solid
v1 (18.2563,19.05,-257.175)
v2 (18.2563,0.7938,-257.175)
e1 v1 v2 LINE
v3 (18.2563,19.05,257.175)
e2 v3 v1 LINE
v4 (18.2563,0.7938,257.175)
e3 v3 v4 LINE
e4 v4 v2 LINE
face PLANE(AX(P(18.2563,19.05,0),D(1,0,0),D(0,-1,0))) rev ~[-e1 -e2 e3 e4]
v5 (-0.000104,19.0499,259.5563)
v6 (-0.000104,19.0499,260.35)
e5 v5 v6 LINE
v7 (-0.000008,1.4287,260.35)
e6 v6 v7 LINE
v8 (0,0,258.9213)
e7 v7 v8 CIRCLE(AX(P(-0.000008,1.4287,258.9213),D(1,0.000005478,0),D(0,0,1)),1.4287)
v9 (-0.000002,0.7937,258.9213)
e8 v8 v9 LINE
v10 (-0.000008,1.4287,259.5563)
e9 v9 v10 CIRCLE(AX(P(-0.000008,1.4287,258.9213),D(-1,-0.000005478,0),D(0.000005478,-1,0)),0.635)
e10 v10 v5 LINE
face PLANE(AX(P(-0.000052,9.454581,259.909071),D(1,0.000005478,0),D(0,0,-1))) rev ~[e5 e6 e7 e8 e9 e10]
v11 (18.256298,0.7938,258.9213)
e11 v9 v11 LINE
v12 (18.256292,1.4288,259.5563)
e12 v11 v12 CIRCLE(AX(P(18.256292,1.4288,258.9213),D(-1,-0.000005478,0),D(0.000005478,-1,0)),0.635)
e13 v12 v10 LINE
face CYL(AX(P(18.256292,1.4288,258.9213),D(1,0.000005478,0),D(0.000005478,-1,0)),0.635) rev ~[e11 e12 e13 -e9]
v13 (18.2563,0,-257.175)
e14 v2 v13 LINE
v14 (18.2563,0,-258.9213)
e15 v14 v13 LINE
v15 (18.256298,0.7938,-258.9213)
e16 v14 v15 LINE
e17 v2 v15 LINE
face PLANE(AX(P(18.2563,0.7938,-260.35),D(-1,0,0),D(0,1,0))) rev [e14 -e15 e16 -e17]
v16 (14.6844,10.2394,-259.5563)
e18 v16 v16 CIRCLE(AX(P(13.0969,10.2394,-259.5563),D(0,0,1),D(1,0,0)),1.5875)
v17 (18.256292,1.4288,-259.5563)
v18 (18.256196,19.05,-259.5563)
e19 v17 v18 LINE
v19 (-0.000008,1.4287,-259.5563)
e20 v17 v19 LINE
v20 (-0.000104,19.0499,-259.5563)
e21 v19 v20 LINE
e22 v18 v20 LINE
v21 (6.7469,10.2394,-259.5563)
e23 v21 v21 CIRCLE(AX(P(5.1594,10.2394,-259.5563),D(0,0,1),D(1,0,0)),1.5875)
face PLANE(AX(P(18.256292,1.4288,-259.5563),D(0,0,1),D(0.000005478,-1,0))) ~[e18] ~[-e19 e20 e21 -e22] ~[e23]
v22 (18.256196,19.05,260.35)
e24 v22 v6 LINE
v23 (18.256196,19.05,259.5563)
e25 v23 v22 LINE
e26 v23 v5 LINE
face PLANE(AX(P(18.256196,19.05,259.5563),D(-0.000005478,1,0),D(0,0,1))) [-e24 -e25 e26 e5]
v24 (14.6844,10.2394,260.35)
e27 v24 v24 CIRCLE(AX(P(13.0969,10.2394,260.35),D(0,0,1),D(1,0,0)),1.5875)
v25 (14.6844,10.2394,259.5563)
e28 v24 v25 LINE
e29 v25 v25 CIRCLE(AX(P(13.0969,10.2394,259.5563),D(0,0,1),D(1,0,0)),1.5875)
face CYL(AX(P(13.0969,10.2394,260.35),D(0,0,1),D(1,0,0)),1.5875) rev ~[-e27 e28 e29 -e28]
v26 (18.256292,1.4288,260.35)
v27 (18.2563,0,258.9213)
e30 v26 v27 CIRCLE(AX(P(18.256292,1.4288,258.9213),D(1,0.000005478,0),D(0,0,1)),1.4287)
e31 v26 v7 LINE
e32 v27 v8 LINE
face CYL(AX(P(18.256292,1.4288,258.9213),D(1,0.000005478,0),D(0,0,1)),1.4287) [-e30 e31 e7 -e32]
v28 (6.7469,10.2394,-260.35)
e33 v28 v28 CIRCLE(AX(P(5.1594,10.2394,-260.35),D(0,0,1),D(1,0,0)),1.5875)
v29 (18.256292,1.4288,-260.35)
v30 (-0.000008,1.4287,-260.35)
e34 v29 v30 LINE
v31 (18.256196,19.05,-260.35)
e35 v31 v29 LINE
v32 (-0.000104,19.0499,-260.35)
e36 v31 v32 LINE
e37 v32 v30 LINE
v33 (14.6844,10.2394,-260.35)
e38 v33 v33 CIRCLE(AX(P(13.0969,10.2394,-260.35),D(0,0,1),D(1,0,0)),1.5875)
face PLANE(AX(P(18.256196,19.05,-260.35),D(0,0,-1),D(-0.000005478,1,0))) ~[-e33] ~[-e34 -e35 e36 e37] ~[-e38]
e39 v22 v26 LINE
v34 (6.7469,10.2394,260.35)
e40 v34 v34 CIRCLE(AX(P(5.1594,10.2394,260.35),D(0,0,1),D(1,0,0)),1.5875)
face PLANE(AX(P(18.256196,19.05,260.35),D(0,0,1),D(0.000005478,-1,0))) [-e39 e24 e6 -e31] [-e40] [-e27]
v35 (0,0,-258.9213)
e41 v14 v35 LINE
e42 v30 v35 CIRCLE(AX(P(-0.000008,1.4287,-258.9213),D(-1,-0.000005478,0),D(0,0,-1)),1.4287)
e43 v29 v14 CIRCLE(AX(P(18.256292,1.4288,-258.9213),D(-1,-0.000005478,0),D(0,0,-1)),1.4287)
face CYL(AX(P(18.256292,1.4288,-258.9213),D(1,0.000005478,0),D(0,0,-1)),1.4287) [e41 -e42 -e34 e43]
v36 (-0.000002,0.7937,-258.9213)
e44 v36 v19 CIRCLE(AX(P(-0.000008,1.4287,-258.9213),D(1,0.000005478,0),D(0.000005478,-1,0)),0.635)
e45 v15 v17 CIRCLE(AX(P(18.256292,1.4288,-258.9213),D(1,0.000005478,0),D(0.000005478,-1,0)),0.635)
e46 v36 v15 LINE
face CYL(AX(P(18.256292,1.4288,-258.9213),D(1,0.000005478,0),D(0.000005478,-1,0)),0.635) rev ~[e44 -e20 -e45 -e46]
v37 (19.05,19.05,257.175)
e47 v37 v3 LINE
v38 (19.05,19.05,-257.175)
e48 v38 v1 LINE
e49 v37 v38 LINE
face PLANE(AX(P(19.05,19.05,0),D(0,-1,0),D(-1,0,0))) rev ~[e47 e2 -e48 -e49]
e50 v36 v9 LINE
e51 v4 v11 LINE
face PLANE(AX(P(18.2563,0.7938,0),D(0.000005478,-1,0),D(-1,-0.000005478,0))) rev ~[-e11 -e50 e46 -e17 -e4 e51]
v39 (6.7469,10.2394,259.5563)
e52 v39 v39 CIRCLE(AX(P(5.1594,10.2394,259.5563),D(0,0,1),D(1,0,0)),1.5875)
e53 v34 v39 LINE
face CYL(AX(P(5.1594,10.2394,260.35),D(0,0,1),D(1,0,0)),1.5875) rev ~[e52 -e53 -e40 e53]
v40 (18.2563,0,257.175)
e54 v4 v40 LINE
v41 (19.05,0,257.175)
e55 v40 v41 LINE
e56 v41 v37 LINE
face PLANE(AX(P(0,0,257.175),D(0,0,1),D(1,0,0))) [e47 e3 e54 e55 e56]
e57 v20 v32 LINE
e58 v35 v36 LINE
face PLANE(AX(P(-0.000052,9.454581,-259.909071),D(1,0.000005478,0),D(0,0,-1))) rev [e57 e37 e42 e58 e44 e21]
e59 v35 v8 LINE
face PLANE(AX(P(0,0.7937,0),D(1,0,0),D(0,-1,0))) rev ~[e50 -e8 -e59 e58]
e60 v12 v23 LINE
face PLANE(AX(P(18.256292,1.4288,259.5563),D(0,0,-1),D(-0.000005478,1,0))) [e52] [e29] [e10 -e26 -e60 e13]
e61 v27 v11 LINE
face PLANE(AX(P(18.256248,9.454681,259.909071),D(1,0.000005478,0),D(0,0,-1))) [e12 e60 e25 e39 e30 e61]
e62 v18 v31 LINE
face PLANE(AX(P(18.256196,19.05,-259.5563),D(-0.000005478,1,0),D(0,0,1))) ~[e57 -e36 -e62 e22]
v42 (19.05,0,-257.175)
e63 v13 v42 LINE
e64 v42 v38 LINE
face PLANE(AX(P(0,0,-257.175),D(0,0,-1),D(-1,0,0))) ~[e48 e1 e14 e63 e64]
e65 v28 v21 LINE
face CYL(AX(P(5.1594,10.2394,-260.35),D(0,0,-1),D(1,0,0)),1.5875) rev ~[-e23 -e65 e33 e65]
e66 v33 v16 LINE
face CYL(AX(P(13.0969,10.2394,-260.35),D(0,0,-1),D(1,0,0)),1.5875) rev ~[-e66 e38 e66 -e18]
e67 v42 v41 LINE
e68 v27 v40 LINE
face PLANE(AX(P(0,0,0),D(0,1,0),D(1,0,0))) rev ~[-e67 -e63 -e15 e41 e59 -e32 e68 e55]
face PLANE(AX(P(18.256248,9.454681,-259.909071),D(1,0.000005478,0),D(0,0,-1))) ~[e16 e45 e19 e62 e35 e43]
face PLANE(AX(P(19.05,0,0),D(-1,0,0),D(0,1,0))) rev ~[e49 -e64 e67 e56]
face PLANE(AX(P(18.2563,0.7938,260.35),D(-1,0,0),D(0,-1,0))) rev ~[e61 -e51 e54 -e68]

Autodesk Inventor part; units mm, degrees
ref_plane "YZ Plane" through (0, 0, 0) normal (1, 0, 0) x (0, 1, 0)
ref_plane "XZ Plane" through (0, 0, 0) normal (0, 1, 0) x (-1, 0, 0)
ref_plane "XY Plane" through (0, 0, 0) normal (0, 0, 1) x (1, 0, 0)
sketch "Sketch1" plane through (0, 0, 0) normal (0, 0, 1) x (1, 0, 0)
  line L0 (0, 0) -> (19.05, 0)
  line L1 (19.05, 0) -> (19.05, 19.05)
  line L2 (19.05, 19.05) -> (18.2563, 19.05)
  line L3 (18.2563, 19.05) -> (18.2563, 0.7938)
  line L4 (18.2563, 0.7938) -> (0, 0.7937)
  line L5 (0, 0.7937) -> (0, 0)
  dimension "d0" = 19.05
  dimension "d1" = 19.05
  dimension "d2" = 0.7937
extrude "Extrusion1" add sketch "Sketch1" along normal blind 260.35
sketch "Sketch2" plane through (0, 0, 260.35) normal (0, 0, 1) x (1, 0, 0)
  line L0 (0, 0) -> (19.05, 0) projected
  line L1 (19.05, 0) -> (19.05, 19.05) projected
  line L2 (19.05, 19.05) -> (18.2563, 19.05) projected
  line L3 (18.2563, 19.05) -> (18.2563, 0.7938) projected
  line L4 (18.2563, 0.7938) -> (18.2563, 0)
extrude "Extrusion2" cut sketch "Sketch2" against normal blind 3.175
sketch "Sketch3" plane through (18.2563, 0, 259.5563) normal (0, 0, 1) x (1, 0, 0)
  line L0 (-18.2563, 0) -> (0, 0)
  line L1 (0, 0) -> (0, 19.05)
  line L2 (0, 19.05) -> (-18.2563, 19.05)
  line L3 (-18.2563, 19.05) -> (-18.2563, 0)
edge flange "Flange1" height 19.05 angle 90 thickness 0.7937 bend radius 0.635 thickness toward (0, 0, 1) relief straight relief width 0.7937 relief depth 0.3969 edges at (9.1281, 0.7938, 260.35) wall of the first edge with corners at (0, 0, 259.5563) (18.2563, 0, 259.5563) (18.2562, 19.05, 259.5563) (0, 19.05, 259.5563)
bend "Bend1"
corner "Corner1"
sketch "Sketch4" plane through (0, 19.05, 260.35) normal (0, 0, 1) x (1, 0, 0)
  line L0 (0, -17.6213) -> (18.2563, -17.6213) projected
  line L1 (0, 0) -> (18.2563, 0) projected
  circle A0 centre (5.1594, -8.8106) radius 1.5875
  circle A1 centre (13.0969, -8.8106) radius 1.5875
  line L2 (5.1594, -8.8106) -> (13.0969, -8.8106) construction
  line L3 (9.1281, 0) -> (9.1281, -17.6213) construction
  point P0 (0, -19.05)
  point P1 (9.1281, -8.8106)
  dimension "d21" = 3.175
  dimension "d22" = 7.9375
extrude "Extrusion3" cut sketch "Sketch4" against normal through all
mirror "Mirror1" about plane through (13.8989, 5.1511, 0) normal (0, 0, -1)
equation "\"d7\" = BendReliefWidth"
equation "\"d8\" = BendReliefDepth"
equation "\"d9\" = MinimumRemnant"
equation "\"d10\" = BendRadius"
equation "\"d14\" = CornerReliefSize"
equation "\"d15\" = GapSize"
equation "\"d16\" = JacobiRadiusSize"
equation "\"BendRadius\" = Thickness"
equation "\"BendReliefWidth\" = Thickness"
equation "\"BendReliefDepth\" = 0.5 * Thickness"
equation "\"CornerReliefSize\" = 4 * Thickness"
equation "\"MinimumRemnant\" = 2 * Thickness"
equation "\"TransitionRadius\" = BendRadius"
equation "\"JacobiRadiusSize\" = Thickness"
equation "\"GapSize\" = Thickness"
equation "\"Thickness\" = 0.79375"
properties part number "Climber Connector Bar" material "Aluminum 6061"
